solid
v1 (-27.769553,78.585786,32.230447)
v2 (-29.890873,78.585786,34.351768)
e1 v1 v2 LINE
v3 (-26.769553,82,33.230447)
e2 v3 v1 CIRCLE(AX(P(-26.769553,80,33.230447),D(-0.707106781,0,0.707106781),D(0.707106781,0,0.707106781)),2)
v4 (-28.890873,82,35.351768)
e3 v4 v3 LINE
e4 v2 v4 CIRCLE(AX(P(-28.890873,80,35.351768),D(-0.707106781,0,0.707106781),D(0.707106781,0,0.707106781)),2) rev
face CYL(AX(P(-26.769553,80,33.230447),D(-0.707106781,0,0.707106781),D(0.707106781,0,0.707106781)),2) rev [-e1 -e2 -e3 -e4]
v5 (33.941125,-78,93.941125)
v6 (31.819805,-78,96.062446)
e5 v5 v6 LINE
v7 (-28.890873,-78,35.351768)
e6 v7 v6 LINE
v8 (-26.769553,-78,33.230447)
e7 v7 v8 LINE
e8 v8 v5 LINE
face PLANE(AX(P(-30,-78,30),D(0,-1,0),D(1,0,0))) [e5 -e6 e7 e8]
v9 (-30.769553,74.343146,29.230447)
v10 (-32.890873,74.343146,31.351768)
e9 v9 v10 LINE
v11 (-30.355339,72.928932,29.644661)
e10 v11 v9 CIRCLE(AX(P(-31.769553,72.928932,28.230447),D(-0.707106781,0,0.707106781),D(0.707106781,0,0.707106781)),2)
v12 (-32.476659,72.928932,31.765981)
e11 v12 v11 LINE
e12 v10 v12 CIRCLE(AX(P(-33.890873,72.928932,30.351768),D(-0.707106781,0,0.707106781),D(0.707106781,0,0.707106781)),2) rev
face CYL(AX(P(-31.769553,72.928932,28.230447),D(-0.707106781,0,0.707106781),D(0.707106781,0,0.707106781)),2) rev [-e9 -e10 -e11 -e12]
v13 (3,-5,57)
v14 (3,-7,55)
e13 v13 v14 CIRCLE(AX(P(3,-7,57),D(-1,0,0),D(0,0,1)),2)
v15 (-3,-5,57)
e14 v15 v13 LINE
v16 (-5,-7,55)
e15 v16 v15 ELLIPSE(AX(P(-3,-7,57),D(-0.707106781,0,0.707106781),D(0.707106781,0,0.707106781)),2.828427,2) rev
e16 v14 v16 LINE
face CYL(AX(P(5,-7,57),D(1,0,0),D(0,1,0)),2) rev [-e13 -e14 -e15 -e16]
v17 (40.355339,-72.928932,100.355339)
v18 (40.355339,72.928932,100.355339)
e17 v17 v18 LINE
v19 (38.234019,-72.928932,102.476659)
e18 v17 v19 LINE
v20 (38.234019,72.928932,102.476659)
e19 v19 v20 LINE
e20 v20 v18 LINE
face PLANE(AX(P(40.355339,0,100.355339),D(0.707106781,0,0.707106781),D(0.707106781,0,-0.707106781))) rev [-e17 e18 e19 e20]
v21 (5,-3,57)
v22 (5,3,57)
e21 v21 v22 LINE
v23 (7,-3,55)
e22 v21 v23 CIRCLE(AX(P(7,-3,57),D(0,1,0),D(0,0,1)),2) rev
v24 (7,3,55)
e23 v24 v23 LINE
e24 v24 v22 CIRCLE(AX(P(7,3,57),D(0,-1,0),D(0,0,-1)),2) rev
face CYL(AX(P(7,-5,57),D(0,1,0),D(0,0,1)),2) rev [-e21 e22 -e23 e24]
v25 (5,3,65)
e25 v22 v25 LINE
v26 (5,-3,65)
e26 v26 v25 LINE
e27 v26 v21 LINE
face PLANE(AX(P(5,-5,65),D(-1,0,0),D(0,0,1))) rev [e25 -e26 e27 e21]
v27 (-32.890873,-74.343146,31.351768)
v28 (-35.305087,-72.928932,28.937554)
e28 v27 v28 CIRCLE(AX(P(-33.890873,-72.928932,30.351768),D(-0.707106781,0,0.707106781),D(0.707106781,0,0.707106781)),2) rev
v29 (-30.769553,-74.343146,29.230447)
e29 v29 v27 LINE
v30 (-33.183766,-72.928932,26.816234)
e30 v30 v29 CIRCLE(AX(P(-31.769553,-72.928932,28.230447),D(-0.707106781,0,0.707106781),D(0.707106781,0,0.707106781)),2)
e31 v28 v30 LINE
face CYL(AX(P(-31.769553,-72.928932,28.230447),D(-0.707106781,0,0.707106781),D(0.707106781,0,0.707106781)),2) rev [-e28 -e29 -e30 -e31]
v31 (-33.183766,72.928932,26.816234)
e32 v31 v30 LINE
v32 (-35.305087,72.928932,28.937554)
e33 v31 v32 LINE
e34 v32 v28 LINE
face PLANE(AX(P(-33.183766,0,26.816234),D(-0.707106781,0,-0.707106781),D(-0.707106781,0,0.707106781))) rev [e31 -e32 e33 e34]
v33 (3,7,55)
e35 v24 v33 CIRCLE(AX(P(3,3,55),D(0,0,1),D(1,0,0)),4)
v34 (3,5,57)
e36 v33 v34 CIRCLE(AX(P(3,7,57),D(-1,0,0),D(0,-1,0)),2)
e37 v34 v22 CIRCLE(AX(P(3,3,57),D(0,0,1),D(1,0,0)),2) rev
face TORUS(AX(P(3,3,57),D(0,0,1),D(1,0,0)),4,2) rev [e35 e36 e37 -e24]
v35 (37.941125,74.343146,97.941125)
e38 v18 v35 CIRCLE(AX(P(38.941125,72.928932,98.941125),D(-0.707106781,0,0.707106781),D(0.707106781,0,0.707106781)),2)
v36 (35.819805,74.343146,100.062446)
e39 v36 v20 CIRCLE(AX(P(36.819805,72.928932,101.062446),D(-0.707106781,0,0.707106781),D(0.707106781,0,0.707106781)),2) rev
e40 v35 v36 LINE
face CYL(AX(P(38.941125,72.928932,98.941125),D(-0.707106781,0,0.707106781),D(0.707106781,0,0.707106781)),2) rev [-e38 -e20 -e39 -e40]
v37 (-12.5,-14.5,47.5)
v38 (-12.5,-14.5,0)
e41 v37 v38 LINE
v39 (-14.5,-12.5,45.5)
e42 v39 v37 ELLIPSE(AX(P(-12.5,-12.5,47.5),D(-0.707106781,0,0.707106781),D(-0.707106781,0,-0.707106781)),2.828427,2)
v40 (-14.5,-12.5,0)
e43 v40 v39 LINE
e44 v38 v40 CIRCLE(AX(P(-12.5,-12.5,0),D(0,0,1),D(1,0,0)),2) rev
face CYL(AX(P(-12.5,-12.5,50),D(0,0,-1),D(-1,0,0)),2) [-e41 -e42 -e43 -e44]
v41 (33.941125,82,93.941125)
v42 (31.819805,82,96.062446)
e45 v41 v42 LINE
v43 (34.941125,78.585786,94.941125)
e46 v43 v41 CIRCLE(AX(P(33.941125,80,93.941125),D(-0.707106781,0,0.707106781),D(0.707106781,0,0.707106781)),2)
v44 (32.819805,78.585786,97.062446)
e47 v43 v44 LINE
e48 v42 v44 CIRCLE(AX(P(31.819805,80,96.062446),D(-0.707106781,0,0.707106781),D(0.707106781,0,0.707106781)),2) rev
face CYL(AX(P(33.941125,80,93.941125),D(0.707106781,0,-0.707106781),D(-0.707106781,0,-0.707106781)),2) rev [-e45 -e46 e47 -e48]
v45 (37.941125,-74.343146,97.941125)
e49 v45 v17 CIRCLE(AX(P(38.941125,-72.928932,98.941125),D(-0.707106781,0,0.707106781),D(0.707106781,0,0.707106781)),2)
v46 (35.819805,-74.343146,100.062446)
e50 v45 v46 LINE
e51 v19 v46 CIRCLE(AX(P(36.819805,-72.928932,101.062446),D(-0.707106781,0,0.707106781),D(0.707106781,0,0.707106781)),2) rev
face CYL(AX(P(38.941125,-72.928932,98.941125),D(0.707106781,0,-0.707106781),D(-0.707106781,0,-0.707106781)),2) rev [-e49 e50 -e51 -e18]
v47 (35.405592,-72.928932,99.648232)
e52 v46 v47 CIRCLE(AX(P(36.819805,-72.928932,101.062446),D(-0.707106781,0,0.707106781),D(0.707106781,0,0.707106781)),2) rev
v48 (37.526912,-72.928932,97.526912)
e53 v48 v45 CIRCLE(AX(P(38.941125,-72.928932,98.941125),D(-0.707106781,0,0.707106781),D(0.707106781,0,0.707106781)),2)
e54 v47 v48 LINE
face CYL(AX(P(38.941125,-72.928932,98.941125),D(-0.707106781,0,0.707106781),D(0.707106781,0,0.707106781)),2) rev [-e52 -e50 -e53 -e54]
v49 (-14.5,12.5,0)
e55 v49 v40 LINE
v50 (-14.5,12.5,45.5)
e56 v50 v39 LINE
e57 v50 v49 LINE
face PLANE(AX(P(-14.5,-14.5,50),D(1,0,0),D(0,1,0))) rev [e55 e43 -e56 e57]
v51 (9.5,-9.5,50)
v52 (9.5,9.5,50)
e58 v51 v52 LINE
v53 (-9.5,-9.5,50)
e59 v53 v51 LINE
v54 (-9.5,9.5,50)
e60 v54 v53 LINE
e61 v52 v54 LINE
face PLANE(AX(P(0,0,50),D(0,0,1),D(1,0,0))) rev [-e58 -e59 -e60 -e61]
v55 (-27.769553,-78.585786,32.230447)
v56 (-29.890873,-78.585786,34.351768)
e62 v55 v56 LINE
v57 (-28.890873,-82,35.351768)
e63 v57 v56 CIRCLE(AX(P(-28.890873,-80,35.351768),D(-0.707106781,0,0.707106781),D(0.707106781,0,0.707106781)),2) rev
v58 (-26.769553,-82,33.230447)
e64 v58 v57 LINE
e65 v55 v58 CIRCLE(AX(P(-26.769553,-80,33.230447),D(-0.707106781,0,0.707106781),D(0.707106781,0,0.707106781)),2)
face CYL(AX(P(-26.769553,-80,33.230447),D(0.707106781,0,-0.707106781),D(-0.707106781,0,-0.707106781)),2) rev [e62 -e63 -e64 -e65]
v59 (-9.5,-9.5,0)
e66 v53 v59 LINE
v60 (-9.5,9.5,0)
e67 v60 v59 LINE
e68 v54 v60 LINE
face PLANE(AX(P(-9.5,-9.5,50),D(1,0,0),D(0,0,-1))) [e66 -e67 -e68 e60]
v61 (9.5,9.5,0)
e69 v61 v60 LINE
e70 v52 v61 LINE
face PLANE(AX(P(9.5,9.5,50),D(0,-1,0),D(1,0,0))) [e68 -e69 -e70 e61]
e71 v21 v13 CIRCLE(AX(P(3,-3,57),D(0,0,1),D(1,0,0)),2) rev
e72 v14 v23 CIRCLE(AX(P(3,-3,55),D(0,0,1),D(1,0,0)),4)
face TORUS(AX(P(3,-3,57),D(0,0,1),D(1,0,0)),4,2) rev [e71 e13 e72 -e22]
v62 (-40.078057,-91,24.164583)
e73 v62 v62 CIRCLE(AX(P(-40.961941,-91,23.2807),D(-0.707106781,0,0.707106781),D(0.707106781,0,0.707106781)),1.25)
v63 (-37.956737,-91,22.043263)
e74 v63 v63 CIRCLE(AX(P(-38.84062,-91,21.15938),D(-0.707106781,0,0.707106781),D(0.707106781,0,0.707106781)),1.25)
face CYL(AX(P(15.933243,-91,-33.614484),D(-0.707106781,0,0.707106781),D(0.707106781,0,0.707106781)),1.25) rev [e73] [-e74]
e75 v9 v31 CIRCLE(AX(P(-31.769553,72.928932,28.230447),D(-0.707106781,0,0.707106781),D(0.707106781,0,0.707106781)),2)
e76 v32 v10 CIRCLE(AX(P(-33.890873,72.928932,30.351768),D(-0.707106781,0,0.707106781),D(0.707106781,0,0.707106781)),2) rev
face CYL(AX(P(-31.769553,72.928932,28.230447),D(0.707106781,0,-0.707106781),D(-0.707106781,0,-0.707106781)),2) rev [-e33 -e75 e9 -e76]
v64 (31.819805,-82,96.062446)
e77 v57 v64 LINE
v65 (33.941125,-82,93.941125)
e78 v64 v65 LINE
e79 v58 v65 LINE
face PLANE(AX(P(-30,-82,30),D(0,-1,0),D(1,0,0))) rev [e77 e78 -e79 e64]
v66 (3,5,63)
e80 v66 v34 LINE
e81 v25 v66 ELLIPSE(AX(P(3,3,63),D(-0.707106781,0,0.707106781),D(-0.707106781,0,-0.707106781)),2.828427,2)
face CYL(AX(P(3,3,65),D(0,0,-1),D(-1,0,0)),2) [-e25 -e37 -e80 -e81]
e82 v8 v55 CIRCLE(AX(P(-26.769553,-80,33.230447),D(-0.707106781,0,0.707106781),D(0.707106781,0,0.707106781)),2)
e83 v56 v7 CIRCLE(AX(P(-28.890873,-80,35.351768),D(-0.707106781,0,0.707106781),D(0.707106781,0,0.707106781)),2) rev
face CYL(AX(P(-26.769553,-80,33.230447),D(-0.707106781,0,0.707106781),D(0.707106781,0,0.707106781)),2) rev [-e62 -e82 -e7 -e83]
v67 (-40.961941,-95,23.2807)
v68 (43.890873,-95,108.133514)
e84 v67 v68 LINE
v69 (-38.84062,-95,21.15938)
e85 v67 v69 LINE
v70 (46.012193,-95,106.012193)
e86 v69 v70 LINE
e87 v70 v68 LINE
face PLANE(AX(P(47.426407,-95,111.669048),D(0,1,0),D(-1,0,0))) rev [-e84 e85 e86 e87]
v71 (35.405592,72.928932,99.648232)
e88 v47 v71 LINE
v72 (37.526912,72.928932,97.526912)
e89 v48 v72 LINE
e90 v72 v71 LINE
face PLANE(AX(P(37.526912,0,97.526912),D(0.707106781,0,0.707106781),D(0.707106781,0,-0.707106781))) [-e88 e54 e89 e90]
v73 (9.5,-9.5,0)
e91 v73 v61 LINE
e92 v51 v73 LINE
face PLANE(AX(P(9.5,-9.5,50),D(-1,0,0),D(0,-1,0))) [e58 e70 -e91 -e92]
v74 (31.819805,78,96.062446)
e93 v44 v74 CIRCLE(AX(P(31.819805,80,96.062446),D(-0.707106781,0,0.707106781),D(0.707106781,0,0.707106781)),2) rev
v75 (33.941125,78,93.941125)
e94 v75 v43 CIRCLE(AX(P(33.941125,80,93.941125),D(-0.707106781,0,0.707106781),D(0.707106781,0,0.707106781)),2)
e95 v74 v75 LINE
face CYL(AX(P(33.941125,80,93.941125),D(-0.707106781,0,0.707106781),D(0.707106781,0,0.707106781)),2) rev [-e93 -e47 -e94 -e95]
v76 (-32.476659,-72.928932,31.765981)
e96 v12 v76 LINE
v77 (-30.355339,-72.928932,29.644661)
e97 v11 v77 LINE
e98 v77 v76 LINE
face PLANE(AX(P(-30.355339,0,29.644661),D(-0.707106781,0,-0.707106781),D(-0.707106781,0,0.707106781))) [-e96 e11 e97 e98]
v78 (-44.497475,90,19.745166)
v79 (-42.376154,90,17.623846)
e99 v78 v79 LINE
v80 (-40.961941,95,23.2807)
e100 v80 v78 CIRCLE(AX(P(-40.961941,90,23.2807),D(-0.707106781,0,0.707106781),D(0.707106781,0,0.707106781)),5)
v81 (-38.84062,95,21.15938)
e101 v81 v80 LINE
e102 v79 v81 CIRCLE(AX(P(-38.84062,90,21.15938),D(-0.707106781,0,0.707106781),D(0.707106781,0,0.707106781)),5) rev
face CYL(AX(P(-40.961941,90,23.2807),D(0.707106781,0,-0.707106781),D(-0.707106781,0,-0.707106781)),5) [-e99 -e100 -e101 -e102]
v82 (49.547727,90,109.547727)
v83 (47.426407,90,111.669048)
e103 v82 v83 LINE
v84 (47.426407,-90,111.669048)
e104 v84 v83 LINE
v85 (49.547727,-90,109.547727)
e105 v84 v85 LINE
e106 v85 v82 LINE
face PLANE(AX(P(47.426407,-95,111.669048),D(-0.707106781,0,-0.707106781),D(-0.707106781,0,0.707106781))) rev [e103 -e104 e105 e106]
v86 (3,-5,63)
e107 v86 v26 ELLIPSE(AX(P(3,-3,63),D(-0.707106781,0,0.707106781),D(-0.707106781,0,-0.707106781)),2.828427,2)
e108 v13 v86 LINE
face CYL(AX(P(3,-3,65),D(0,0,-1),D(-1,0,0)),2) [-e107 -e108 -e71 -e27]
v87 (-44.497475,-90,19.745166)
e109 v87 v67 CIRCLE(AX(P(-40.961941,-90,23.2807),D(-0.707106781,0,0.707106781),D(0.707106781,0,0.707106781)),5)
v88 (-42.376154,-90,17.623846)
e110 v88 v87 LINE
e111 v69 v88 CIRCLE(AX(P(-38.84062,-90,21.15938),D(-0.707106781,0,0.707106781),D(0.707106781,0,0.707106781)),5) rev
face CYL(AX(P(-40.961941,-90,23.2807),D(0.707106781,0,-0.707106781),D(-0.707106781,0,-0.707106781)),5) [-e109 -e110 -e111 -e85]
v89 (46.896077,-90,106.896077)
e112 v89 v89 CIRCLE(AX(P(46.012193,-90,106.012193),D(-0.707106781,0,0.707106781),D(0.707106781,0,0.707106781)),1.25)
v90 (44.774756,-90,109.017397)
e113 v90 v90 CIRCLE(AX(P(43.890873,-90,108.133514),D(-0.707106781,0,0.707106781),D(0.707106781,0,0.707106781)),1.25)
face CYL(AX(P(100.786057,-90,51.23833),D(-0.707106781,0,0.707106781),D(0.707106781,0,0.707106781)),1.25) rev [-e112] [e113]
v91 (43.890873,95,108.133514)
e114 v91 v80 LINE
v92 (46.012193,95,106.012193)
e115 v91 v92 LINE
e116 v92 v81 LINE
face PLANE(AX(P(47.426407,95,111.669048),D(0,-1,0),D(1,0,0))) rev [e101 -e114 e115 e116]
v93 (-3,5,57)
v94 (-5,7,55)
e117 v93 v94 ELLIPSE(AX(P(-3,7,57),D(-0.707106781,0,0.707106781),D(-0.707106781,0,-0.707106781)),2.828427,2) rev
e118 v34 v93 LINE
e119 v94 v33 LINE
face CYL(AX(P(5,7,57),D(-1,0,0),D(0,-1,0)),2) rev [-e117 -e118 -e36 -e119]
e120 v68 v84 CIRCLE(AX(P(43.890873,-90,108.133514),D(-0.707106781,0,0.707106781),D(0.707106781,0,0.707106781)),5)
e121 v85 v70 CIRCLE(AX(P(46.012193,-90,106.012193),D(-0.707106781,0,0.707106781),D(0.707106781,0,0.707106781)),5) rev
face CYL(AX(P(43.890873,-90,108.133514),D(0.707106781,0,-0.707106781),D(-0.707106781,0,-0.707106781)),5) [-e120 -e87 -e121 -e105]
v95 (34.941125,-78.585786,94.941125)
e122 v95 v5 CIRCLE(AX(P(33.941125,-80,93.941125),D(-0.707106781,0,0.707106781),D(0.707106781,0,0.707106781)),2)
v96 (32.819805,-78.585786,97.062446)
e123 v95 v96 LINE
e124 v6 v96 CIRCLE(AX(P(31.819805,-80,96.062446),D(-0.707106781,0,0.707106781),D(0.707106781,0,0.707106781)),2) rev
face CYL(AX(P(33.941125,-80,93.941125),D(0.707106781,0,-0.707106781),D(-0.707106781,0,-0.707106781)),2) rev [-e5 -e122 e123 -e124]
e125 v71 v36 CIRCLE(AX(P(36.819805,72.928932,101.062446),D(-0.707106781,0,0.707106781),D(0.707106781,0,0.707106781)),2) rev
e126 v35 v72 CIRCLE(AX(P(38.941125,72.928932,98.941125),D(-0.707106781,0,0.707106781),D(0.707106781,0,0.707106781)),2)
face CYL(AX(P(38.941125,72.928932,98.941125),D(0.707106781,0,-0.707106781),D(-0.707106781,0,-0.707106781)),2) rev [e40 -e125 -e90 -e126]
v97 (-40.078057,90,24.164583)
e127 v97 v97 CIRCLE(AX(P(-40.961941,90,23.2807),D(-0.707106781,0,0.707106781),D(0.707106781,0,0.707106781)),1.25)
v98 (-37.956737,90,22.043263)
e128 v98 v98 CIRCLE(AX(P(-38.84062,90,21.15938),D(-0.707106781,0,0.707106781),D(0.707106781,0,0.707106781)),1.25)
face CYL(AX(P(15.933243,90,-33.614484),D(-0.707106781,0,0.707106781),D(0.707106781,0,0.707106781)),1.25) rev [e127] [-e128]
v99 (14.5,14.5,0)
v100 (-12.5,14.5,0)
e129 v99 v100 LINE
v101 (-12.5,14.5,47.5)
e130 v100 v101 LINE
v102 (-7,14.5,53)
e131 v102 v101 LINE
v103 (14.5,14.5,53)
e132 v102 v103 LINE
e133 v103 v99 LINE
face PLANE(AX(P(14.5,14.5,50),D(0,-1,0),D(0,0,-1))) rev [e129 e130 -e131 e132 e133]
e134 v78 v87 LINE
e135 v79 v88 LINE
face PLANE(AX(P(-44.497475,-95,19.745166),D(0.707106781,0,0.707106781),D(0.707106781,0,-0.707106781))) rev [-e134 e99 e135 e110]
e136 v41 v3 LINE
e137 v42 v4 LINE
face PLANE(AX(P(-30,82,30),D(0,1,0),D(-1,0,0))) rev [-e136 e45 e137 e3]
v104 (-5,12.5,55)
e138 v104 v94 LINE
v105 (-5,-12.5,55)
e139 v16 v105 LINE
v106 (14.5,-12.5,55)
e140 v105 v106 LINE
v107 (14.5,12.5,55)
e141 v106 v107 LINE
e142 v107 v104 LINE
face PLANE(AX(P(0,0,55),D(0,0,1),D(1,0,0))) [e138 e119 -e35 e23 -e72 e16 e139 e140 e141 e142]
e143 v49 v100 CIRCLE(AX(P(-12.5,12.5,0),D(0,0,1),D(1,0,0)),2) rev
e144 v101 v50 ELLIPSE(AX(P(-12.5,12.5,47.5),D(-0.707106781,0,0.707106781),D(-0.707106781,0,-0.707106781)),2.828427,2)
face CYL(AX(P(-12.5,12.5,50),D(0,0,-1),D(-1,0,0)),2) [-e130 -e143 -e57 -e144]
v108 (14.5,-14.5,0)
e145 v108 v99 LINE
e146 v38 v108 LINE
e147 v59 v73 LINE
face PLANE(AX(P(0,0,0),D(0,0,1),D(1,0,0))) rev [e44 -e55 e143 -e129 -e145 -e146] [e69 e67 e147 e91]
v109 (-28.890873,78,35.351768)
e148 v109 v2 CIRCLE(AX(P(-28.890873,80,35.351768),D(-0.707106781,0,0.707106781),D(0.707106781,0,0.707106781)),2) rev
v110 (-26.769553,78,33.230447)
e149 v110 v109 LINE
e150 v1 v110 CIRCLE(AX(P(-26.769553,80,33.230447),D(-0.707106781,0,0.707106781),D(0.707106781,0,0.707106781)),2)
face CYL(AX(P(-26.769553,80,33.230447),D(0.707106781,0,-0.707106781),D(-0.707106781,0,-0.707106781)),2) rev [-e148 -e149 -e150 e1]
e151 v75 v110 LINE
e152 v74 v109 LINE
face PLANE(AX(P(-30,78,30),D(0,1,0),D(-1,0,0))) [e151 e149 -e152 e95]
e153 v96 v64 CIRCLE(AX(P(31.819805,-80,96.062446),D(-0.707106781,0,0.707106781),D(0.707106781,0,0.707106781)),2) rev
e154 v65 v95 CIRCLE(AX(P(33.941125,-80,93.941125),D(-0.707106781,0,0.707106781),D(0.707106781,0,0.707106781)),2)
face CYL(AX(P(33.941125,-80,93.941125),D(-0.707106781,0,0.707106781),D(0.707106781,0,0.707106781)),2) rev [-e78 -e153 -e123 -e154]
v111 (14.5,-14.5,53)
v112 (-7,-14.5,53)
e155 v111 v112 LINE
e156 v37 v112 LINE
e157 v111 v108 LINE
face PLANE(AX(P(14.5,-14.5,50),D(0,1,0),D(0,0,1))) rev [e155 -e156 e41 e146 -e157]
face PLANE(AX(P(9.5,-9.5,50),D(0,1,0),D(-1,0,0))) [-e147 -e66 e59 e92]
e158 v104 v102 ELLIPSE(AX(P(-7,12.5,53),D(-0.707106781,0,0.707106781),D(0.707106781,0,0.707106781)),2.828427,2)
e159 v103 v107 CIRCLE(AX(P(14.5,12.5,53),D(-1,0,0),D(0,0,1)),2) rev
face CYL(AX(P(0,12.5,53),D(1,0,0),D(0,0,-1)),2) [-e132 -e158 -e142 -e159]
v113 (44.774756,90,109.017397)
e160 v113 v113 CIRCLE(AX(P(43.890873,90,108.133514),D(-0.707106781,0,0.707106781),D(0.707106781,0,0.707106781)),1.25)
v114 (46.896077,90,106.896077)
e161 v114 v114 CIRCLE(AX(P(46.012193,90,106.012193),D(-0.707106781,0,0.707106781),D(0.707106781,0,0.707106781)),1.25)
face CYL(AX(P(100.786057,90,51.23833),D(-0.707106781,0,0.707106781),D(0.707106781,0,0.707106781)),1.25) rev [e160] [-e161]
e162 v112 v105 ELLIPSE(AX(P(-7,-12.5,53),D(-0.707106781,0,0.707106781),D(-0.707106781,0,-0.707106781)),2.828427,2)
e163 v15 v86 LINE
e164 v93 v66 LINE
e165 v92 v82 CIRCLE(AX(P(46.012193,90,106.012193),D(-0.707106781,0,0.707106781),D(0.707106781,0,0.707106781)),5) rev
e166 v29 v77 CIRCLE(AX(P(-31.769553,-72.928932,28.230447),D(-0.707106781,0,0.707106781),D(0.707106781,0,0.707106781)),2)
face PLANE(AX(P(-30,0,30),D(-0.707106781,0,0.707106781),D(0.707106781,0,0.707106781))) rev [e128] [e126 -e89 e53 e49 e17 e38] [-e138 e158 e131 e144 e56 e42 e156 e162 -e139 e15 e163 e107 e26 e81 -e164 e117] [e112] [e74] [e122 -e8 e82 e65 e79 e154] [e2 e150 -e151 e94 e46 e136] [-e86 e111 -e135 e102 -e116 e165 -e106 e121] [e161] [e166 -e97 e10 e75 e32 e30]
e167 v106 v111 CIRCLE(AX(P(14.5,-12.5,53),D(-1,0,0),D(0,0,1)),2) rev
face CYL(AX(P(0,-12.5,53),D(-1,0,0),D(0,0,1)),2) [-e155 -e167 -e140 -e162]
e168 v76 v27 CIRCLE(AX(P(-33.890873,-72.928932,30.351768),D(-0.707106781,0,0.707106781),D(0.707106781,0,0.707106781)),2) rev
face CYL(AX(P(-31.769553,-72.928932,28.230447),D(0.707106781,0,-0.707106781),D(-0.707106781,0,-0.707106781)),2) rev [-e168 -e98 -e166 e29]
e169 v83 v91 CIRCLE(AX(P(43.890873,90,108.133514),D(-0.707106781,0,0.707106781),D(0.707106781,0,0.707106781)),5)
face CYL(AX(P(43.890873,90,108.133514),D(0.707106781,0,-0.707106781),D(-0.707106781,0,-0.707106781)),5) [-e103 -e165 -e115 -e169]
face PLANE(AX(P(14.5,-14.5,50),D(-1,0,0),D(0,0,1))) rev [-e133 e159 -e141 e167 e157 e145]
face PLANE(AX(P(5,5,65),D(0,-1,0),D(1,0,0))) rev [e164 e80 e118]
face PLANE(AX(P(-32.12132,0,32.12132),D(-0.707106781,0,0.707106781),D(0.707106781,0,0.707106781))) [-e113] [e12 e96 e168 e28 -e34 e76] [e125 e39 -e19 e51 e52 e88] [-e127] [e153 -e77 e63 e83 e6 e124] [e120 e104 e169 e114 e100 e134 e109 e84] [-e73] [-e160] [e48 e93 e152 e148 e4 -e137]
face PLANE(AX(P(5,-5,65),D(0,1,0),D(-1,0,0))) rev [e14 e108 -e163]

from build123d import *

# Parameters (mm, degrees)
SKETCH_1_W          = 29
SKETCH_1_H          = 29
SKETCH_1_W_2        = 19
SKETCH_1_H_2        = 19
EXTRUDE_1_DEPTH     = 50
SKETCH_2_W          = 29
SKETCH_2_H          = 29
EXTRUDE_2_DEPTH     = 5
SKETCH_3_W          = 10
SKETCH_3_H          = 10
EXTRUDE_3_DEPTH     = 10
CUT_EXTRUDE_1_DEPTH = 10
SKETCH_7_W          = 130
SKETCH_7_H          = 190
EXTRUDE_4_DEPTH     = 3
CUT_EXTRUDE_2_DEPTH = 165.058536671
SKETCH_10_R         = 1.25
CUT_EXTRUDE_3_DEPTH = 149.400384885
CUT_EXTRUDE_9_DEPTH = 3
FILLET_1_R          = 2
FILLET_3_R          = 5


with BuildPart() as part:
    # 草图1 → 凸台-拉伸1 (new body)
    with BuildSketch(Plane.XY):
        Rectangle(SKETCH_1_W, SKETCH_1_H)
        Rectangle(SKETCH_1_W_2, SKETCH_1_H_2, mode=Mode.SUBTRACT)
    extrude(amount=EXTRUDE_1_DEPTH)

    # 草图2 → 凸台-拉伸2 (add)
    with BuildSketch(Plane.XY.offset(50)):
        Rectangle(SKETCH_2_W, SKETCH_2_H)
    extrude(amount=EXTRUDE_2_DEPTH)

    # 草图3 → 凸台-拉伸3 (add)
    with BuildSketch(Plane.XY.offset(55)):
        Rectangle(SKETCH_3_W, SKETCH_3_H)
    extrude(amount=EXTRUDE_3_DEPTH)

    # 草图4 → 切除-拉伸1 (cut)
    with BuildSketch(Plane(origin=(0, 5, 0), x_dir=(1, 0, 0), z_dir=(0, 1, 0))):
        Polygon((-5, -55), (5, -65), (-5, -65), align=None)
    extrude(amount=-CUT_EXTRUDE_1_DEPTH, mode=Mode.SUBTRACT)

    # 草图7 → 凸台-拉伸4 (add)
    with BuildSketch(Plane(origin=(-30, 0, 30), x_dir=(0.7071067811865475, 0, 0.7071067811865476), z_dir=(-0.7071067811865476, 0, 0.7071067811865475))):
        with Locations((47.497474683, 0)):
            Rectangle(SKETCH_7_W, SKETCH_7_H)
    extrude(amount=EXTRUDE_4_DEPTH)

    # 草图8 → 切除-拉伸2 (cut, through all)
    with BuildSketch(Plane.XZ.offset(14.5)):
        Polygon((-14.5, 55), (-14.5, 49.742640687), (-9.242640687, 55), align=None)
    extrude(amount=-CUT_EXTRUDE_2_DEPTH, mode=Mode.SUBTRACT)

    # 草图10 → 切除-拉伸3 (cut, through all)
    with BuildSketch(Plane(origin=(-32.121320344, 0, 32.121320344), x_dir=(0.7071067811865475, 0, 0.7071067811865476), z_dir=(-0.7071067811865476, 0, 0.7071067811865475))):
        with Locations((107.497474683, 90)):
            Circle(SKETCH_10_R)
        with Locations((-12.502525317, 90)):
            Circle(SKETCH_10_R)
        with Locations((-12.502525317, -91)):
            Circle(SKETCH_10_R)
        with Locations((107.497474683, -90)):
            Circle(SKETCH_10_R)
    extrude(amount=-CUT_EXTRUDE_3_DEPTH, mode=Mode.SUBTRACT)

    # 草图11 → 切除-拉伸9 (cut)
    with BuildSketch(Plane(origin=(-32.121320344, 0, 32.121320344), x_dir=(0.7071067811865475, 0, 0.7071067811865476), z_dir=(-0.7071067811865476, 0, 0.7071067811865475))):
        Polygon((-0.25988463, -82), (95.254833996, -82), (91.254833996, -78), (3.74011537, -78), align=None)
        Polygon((99.497474683, -77.757359313), (99.497474683, 77.757359313), (95.497474683, 73.757359313), (95.497474683, -73.757359313), align=None)
        Polygon((-0.502525317, 73.757359313), (-4.502525317, 77.757359313), (-4.502525317, -77.757359313), (-0.502525317, -73.757359313), align=None)
        Polygon((91.254833996, 78), (95.254833996, 82), (-0.25988463, 82), (3.74011537, 78), align=None)
    extrude(amount=-CUT_EXTRUDE_9_DEPTH, mode=Mode.SUBTRACT)

    # 圆角1
    fillet_1_edges = [part.edges().sort_by_distance(p)[0] for p in [
        (5, 0, 55),
        (0, 5, 55),
        (5, 5, 60),
        (5, -5, 60),
        (0, -5, 55),
        (4.75, -14.5, 55),
        (-14.5, -14.5, 22.75),
        (-14.5, 14.5, 22.75),
        (4.75, 14.5, 55),
        (-28.415999231, 78, 33.705321112),
        (-31.244426356, 82, 30.876893988),
        (36.294678888, 82, 98.415999231),
        (33.466251763, 78, 95.587572106),
        (-31.415999231, -73.757359313, 30.705321112),
        (-34.244426356, -77.757359313, 27.876893988),
        (-34.244426356, 77.757359313, 27.876893988),
        (-31.415999231, 73.757359313, 30.705321112),
        (36.466251763, 73.757359313, 98.587572106),
        (39.294678888, 77.757359313, 101.415999231),
        (39.294678888, -77.757359313, 101.415999231),
        (36.466251763, -73.757359313, 98.587572106),
        (33.466251763, -78, 95.587572106),
        (-31.244426356, -82, 30.876893988),
        (-28.415999231, -78, 33.705321112),
        (36.294678888, -82, 98.415999231),
    ]]
    fillet(fillet_1_edges, radius=FILLET_1_R - 0.0001)  # a hair under: the kernel refuses the full size

    # 圆角3
    fillet_3_edges = [part.edges().sort_by_distance(p)[0] for p in [
        (-43.436814511, 95, 18.684505832),
        (-43.436814511, -95, 18.684505832),
        (48.487067043, -95, 110.608387387),
        (48.487067043, 95, 110.608387387),
    ]]
    fillet(fillet_3_edges, radius=FILLET_3_R)


solid = part.part
